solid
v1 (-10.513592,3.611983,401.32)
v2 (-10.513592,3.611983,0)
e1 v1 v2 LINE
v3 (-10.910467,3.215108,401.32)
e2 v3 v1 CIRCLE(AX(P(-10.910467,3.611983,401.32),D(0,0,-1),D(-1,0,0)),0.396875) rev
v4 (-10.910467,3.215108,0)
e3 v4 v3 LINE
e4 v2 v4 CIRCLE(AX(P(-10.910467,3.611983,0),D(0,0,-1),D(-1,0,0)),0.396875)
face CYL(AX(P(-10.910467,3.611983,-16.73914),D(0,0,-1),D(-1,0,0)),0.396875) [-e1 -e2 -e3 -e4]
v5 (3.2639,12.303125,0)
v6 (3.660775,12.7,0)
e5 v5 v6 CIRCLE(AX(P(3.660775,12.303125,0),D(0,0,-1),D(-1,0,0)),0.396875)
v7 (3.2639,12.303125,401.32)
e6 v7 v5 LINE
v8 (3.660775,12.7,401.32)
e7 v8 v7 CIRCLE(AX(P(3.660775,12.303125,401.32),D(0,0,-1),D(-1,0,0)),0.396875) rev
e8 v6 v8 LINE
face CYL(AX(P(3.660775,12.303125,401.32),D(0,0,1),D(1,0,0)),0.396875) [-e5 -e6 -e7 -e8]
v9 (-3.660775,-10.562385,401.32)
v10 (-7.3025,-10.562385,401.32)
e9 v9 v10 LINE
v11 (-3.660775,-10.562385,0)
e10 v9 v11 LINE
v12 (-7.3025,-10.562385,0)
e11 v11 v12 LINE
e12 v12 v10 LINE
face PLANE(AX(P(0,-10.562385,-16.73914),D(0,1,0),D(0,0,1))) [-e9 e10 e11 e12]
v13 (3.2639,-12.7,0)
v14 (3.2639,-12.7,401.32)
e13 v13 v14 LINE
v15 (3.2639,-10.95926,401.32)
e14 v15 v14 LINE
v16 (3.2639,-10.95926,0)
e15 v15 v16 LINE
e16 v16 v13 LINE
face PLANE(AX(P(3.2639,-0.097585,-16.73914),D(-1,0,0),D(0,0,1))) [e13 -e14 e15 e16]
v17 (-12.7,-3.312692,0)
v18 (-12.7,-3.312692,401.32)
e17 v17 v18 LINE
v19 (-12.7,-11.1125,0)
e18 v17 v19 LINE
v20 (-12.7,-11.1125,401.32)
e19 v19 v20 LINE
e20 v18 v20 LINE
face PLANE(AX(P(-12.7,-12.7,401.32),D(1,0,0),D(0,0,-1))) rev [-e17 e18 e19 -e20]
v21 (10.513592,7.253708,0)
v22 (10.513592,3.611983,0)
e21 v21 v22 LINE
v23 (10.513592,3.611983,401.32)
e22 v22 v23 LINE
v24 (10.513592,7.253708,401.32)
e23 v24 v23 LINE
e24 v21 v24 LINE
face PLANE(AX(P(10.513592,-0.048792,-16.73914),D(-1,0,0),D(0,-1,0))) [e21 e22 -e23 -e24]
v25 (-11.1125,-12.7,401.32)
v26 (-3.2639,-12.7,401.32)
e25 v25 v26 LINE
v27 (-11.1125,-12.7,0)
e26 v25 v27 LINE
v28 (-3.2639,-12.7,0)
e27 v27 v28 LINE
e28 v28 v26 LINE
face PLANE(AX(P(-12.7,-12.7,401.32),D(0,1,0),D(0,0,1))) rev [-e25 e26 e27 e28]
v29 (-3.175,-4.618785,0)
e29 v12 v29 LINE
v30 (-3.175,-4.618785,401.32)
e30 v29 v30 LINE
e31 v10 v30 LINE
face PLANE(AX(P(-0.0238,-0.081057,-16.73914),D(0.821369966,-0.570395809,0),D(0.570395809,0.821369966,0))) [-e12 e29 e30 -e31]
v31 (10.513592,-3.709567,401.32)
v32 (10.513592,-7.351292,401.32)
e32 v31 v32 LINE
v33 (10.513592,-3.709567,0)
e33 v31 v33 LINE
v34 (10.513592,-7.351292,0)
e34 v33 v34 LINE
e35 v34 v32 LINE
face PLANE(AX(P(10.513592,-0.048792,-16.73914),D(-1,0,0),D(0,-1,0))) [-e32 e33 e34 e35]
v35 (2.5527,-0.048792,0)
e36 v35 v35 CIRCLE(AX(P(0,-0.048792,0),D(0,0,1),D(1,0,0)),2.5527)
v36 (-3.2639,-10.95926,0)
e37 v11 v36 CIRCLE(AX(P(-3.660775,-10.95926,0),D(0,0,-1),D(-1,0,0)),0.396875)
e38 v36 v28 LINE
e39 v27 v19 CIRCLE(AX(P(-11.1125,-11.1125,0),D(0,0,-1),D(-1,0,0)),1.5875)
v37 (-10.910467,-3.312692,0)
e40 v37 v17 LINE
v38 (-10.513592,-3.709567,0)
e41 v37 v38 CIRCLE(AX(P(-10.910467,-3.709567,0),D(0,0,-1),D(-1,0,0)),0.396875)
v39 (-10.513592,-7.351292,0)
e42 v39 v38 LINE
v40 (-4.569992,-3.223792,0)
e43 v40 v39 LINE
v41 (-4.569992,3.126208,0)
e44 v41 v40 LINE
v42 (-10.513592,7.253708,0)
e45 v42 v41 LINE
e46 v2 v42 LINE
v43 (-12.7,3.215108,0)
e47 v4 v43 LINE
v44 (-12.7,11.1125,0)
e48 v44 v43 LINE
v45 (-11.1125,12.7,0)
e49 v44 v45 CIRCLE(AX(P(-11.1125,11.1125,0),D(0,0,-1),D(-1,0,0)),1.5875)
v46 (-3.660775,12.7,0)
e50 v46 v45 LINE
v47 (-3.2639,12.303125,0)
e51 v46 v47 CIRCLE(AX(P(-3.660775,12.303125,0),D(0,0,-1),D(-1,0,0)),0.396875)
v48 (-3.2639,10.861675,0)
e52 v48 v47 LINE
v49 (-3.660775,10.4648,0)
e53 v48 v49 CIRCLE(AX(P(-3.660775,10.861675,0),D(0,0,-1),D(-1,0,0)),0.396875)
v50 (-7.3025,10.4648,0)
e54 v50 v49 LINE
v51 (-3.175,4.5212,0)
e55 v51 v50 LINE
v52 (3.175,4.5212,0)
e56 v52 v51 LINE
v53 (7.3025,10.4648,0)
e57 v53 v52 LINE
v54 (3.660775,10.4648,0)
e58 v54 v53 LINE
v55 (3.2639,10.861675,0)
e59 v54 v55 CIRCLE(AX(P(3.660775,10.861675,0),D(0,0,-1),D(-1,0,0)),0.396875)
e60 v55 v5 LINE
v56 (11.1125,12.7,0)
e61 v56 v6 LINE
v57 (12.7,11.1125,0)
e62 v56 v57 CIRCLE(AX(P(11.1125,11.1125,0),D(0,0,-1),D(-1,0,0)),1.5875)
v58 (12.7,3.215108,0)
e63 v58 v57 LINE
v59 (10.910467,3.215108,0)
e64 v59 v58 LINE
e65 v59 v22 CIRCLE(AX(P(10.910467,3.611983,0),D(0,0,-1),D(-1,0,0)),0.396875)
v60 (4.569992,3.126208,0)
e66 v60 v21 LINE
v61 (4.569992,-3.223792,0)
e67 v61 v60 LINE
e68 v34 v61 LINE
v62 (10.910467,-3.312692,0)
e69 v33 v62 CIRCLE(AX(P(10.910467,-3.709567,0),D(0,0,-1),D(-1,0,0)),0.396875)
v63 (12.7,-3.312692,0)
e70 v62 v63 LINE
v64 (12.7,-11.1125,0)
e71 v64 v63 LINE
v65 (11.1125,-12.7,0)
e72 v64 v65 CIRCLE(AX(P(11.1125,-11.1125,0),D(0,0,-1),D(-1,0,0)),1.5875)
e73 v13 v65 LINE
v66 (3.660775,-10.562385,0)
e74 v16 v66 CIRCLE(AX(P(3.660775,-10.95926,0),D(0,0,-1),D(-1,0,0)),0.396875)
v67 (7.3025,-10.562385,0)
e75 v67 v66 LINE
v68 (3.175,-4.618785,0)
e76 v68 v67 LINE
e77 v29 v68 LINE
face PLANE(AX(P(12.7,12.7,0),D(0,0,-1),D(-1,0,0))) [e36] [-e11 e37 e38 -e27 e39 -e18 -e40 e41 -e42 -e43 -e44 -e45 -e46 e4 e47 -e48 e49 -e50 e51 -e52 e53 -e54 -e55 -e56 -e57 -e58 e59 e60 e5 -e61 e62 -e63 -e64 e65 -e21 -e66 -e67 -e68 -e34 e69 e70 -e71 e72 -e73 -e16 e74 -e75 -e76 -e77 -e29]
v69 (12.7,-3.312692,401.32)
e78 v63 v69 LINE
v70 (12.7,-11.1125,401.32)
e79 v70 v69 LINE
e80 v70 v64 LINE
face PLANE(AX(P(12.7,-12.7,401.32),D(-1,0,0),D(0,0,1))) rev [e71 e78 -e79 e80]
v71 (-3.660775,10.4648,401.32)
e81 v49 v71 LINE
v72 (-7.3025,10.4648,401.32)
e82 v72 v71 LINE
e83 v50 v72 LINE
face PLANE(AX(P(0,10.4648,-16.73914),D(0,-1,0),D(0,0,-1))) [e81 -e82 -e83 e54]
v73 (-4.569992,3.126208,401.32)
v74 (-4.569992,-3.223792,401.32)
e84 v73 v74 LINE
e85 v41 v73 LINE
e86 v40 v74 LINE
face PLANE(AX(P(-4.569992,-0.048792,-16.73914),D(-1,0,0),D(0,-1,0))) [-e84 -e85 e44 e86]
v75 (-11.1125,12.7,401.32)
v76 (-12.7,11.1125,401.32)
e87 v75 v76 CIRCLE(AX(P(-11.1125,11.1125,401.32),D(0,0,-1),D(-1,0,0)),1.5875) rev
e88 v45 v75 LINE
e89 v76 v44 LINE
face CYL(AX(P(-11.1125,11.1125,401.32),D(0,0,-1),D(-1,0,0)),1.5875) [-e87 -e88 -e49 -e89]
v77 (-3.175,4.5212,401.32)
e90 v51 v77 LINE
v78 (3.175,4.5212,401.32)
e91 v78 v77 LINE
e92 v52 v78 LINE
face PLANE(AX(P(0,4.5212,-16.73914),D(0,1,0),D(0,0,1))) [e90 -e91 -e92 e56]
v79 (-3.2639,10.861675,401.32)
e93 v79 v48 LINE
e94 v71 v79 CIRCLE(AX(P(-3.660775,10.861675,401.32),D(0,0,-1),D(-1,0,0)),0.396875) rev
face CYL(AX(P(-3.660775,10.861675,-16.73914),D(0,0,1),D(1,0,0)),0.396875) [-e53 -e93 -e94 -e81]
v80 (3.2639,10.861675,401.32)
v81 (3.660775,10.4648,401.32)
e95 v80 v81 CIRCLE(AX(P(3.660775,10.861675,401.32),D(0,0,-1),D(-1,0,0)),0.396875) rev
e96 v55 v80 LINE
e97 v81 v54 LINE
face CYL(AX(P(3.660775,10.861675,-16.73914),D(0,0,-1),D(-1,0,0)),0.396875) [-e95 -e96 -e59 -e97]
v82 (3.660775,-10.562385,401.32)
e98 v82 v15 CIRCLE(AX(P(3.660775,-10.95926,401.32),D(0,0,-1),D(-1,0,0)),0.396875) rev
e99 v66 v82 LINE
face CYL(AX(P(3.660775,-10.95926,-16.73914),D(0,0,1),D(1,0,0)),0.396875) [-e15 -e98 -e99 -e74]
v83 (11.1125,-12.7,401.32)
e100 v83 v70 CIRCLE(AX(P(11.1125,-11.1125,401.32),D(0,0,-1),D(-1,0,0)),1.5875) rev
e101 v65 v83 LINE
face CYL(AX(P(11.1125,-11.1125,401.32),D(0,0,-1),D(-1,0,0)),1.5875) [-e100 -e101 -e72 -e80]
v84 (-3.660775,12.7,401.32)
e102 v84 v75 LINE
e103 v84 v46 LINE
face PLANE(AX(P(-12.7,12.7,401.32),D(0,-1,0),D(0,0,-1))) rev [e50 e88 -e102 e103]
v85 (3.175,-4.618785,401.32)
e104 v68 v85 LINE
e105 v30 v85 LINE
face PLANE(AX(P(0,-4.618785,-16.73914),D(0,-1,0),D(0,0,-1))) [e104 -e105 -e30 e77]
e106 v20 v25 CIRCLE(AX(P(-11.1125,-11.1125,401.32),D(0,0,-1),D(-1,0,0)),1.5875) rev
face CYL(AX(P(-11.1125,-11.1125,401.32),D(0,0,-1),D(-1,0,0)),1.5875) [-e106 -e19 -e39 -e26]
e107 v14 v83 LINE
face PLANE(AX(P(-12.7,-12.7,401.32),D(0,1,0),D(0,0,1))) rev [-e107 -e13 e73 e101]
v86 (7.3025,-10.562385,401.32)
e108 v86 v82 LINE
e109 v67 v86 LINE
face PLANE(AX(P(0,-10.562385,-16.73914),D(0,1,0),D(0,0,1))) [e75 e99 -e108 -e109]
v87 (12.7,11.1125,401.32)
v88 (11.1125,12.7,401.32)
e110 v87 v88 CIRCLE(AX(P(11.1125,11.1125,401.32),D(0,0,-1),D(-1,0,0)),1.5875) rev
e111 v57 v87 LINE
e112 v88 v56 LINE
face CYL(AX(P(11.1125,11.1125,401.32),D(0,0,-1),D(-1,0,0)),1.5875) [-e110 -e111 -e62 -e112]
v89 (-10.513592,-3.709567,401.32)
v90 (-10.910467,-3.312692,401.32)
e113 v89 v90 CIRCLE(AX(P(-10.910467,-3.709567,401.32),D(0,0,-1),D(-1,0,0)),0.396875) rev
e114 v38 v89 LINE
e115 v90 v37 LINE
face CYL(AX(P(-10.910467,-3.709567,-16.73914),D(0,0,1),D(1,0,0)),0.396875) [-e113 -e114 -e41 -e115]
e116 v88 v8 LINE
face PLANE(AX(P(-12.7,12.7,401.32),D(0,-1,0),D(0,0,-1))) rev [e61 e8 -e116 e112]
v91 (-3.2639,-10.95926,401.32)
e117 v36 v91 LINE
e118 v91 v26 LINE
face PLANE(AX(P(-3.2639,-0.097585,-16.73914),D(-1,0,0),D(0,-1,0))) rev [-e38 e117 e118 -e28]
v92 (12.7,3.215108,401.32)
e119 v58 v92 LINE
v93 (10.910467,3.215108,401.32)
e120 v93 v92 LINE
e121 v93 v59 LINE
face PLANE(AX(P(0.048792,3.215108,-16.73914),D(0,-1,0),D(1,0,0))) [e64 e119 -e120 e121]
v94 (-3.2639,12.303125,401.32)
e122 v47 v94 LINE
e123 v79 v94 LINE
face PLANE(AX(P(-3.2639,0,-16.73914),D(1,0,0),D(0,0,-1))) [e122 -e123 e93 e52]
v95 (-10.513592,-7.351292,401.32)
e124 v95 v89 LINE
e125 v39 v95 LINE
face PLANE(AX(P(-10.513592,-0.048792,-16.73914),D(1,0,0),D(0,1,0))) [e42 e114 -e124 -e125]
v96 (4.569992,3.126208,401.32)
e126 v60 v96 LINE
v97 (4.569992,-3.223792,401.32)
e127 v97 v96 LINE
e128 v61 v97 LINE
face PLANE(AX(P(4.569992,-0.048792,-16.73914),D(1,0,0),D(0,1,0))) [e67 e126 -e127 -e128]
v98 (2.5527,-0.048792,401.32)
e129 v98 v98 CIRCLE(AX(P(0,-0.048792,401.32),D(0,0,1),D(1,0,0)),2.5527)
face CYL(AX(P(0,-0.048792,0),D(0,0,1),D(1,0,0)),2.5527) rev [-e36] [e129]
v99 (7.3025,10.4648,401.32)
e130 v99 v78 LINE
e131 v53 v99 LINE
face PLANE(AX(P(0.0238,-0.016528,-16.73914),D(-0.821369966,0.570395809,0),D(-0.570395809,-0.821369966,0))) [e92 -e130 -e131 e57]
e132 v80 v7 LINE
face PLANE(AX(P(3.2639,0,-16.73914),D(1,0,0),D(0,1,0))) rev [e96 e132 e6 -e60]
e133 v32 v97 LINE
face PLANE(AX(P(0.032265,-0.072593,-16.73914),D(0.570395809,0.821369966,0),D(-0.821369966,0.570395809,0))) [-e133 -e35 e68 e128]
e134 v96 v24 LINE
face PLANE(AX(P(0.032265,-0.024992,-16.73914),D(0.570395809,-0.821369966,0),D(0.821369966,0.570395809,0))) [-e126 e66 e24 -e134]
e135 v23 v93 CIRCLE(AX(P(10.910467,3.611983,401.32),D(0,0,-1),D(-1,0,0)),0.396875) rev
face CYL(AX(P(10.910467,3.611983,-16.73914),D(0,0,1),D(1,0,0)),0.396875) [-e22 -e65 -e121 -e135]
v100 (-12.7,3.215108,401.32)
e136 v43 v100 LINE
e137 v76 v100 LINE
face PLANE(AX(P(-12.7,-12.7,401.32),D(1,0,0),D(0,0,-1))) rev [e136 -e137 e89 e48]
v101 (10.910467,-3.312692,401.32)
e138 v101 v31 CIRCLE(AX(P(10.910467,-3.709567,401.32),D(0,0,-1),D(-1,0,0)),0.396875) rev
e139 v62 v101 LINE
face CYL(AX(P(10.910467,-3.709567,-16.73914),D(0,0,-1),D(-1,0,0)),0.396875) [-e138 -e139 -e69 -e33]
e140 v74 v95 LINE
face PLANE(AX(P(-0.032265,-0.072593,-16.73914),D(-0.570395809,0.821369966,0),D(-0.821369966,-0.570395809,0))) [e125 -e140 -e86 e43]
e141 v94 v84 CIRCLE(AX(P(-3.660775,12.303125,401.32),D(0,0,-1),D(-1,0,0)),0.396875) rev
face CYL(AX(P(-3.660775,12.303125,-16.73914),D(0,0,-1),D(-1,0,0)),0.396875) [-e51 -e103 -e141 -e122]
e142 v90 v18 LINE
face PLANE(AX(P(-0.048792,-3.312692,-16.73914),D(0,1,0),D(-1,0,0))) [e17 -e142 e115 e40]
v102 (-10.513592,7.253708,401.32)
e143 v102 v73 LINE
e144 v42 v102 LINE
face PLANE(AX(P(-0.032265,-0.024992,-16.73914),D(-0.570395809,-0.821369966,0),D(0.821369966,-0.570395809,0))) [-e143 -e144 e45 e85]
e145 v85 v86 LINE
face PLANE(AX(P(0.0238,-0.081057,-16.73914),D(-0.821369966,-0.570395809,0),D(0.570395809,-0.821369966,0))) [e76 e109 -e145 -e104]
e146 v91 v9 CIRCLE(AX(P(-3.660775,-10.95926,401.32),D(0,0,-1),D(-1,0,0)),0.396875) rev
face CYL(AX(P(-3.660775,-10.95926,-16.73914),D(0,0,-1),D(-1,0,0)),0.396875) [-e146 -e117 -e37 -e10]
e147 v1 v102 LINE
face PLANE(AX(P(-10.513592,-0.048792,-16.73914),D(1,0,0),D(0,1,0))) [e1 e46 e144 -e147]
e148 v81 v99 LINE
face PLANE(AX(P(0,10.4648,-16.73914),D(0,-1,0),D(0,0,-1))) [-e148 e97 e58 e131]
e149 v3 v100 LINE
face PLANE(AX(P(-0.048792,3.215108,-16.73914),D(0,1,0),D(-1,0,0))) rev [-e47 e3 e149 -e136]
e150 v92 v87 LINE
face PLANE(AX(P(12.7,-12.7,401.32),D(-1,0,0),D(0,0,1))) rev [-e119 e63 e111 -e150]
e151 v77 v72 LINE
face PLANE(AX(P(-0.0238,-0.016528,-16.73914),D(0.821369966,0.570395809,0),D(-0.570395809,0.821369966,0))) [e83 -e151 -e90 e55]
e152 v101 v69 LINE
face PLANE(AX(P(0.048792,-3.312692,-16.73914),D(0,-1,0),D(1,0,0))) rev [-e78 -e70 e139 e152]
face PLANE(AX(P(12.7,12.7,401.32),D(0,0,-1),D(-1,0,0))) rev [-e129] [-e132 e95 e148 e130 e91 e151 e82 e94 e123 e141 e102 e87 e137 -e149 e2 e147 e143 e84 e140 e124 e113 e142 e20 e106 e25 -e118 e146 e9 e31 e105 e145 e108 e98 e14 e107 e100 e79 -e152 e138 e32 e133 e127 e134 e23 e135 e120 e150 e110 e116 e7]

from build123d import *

# Parameters (mm, degrees)
SKETCH1_W           = 25.4
SKETCH1_H           = 25.4
BOSS_EXTRUDE1_DEPTH = 401.32
FILLET1_R           = 1.5875
HOLE1_OUTLINE_R     = 2.5527
HOLE1_DEPTH         = 401.32
SKETCH7_W           = 6.5278
SKETCH7_H           = 2.2352
CUT_EXTRUDE2_DEPTH  = 401.32
FILLET4_R           = 0.396875
CIRPATTERN2_DEPTH   = 401.32


# Read off the part's stored shape, not the designer's step: Hole1, CirPattern2
with BuildPart() as part:
    # Sketch1 → Boss-Extrude1 (new body)
    with BuildSketch(Plane.XY):
        Rectangle(SKETCH1_W, SKETCH1_H)
    extrude(amount=BOSS_EXTRUDE1_DEPTH)

    # Fillet1
    fillet1_edges = [part.edges().sort_by_distance(p)[0] for p in [
        (12.7, -12.7, 200.66),
        (-12.7, -12.7, 200.66),
        (-12.7, 12.7, 200.66),
        (12.7, 12.7, 200.66),
    ]]
    fillet(fillet1_edges, radius=FILLET1_R)

    # Hole1 outline → Hole1 (cut)
    with BuildSketch(Plane.XY):
        with Locations((0, -0.048792482)):
            Circle(HOLE1_OUTLINE_R)
    extrude(amount=HOLE1_DEPTH, mode=Mode.SUBTRACT)

    # Sketch7 → Cut-Extrude2 (cut)
    with BuildSketch(Plane.XY.offset(401.32)):
        with Locations((0, 11.5824)):
            Rectangle(SKETCH7_W, SKETCH7_H)
        Polygon((-3.175, 4.5212), (-7.3025, 10.4648), (7.3025, 10.4648), (3.175, 4.5212), align=None)
    extrude(amount=-CUT_EXTRUDE2_DEPTH, mode=Mode.SUBTRACT)

    # Fillet4
    fillet4_edges = [part.edges().sort_by_distance(p)[0] for p in [
        (-3.2639, 10.4648, 200.66),
        (-3.2639, 12.7, 200.66),
        (3.2639, 12.7, 200.66),
        (3.2639, 10.4648, 200.66),
    ]]
    fillet(fillet4_edges, radius=FILLET4_R)

    # CirPattern2 outline → CirPattern2 (cut)
    with BuildSketch(Plane.XY):
        with BuildLine():
            ThreePointArc((-3.660775, -10.562384964), (-3.380141996, -10.67862696), (-3.2639, -10.959259964))
            Line((-3.2639, -10.959259964), (-3.2639, -12.7))
            Line((-3.2639, -12.7), (3.2639, -12.7))
            Line((3.2639, -12.7), (3.2639, -10.959259964))
            ThreePointArc((3.2639, -10.959259964), (3.380141996, -10.67862696), (3.660775, -10.562384964))
            Line((3.660775, -10.562384964), (7.3025, -10.562384964))
            Line((7.3025, -10.562384964), (3.175, -4.618784964))
            Line((3.175, -4.618784964), (-3.175, -4.618784964))
            Line((-3.175, -4.618784964), (-7.3025, -10.562384964))
            Line((-7.3025, -10.562384964), (-3.660775, -10.562384964))
        make_face()
        with BuildLine():
            Line((-12.7, -3.312692482), (-10.910467482, -3.312692482))
            ThreePointArc((-10.910467482, -3.312692482), (-10.629834478, -3.428934478), (-10.513592482, -3.709567482))
            Line((-10.513592482, -3.709567482), (-10.513592482, -7.351292482))
            Line((-10.513592482, -7.351292482), (-4.569992482, -3.223792482))
            Line((-4.569992482, -3.223792482), (-4.569992482, 3.126207518))
            Line((-4.569992482, 3.126207518), (-10.513592482, 7.253707518))
            Line((-10.513592482, 7.253707518), (-10.513592482, 3.611982518))
            ThreePointArc((-10.513592482, 3.611982518), (-10.629834478, 3.331349514), (-10.910467482, 3.215107518))
            Line((-10.910467482, 3.215107518), (-12.7, 3.215107518))
            Line((-12.7, 3.215107518), (-12.7, -3.312692482))
        make_face()
        with BuildLine():
            ThreePointArc((10.513592482, -3.709567482), (10.629834478, -3.428934478), (10.910467482, -3.312692482))
            Line((10.910467482, -3.312692482), (12.7, -3.312692482))
            Line((12.7, -3.312692482), (12.7, 3.215107518))
            Line((12.7, 3.215107518), (10.910467482, 3.215107518))
            ThreePointArc((10.910467482, 3.215107518), (10.629834478, 3.331349514), (10.513592482, 3.611982518))
            Line((10.513592482, 3.611982518), (10.513592482, 7.253707518))
            Line((10.513592482, 7.253707518), (4.569992482, 3.126207518))
            Line((4.569992482, 3.126207518), (4.569992482, -3.223792482))
            Line((4.569992482, -3.223792482), (10.513592482, -7.351292482))
            Line((10.513592482, -7.351292482), (10.513592482, -3.709567482))
        make_face()
    extrude(amount=CIRPATTERN2_DEPTH, mode=Mode.SUBTRACT)


solid = part.part
